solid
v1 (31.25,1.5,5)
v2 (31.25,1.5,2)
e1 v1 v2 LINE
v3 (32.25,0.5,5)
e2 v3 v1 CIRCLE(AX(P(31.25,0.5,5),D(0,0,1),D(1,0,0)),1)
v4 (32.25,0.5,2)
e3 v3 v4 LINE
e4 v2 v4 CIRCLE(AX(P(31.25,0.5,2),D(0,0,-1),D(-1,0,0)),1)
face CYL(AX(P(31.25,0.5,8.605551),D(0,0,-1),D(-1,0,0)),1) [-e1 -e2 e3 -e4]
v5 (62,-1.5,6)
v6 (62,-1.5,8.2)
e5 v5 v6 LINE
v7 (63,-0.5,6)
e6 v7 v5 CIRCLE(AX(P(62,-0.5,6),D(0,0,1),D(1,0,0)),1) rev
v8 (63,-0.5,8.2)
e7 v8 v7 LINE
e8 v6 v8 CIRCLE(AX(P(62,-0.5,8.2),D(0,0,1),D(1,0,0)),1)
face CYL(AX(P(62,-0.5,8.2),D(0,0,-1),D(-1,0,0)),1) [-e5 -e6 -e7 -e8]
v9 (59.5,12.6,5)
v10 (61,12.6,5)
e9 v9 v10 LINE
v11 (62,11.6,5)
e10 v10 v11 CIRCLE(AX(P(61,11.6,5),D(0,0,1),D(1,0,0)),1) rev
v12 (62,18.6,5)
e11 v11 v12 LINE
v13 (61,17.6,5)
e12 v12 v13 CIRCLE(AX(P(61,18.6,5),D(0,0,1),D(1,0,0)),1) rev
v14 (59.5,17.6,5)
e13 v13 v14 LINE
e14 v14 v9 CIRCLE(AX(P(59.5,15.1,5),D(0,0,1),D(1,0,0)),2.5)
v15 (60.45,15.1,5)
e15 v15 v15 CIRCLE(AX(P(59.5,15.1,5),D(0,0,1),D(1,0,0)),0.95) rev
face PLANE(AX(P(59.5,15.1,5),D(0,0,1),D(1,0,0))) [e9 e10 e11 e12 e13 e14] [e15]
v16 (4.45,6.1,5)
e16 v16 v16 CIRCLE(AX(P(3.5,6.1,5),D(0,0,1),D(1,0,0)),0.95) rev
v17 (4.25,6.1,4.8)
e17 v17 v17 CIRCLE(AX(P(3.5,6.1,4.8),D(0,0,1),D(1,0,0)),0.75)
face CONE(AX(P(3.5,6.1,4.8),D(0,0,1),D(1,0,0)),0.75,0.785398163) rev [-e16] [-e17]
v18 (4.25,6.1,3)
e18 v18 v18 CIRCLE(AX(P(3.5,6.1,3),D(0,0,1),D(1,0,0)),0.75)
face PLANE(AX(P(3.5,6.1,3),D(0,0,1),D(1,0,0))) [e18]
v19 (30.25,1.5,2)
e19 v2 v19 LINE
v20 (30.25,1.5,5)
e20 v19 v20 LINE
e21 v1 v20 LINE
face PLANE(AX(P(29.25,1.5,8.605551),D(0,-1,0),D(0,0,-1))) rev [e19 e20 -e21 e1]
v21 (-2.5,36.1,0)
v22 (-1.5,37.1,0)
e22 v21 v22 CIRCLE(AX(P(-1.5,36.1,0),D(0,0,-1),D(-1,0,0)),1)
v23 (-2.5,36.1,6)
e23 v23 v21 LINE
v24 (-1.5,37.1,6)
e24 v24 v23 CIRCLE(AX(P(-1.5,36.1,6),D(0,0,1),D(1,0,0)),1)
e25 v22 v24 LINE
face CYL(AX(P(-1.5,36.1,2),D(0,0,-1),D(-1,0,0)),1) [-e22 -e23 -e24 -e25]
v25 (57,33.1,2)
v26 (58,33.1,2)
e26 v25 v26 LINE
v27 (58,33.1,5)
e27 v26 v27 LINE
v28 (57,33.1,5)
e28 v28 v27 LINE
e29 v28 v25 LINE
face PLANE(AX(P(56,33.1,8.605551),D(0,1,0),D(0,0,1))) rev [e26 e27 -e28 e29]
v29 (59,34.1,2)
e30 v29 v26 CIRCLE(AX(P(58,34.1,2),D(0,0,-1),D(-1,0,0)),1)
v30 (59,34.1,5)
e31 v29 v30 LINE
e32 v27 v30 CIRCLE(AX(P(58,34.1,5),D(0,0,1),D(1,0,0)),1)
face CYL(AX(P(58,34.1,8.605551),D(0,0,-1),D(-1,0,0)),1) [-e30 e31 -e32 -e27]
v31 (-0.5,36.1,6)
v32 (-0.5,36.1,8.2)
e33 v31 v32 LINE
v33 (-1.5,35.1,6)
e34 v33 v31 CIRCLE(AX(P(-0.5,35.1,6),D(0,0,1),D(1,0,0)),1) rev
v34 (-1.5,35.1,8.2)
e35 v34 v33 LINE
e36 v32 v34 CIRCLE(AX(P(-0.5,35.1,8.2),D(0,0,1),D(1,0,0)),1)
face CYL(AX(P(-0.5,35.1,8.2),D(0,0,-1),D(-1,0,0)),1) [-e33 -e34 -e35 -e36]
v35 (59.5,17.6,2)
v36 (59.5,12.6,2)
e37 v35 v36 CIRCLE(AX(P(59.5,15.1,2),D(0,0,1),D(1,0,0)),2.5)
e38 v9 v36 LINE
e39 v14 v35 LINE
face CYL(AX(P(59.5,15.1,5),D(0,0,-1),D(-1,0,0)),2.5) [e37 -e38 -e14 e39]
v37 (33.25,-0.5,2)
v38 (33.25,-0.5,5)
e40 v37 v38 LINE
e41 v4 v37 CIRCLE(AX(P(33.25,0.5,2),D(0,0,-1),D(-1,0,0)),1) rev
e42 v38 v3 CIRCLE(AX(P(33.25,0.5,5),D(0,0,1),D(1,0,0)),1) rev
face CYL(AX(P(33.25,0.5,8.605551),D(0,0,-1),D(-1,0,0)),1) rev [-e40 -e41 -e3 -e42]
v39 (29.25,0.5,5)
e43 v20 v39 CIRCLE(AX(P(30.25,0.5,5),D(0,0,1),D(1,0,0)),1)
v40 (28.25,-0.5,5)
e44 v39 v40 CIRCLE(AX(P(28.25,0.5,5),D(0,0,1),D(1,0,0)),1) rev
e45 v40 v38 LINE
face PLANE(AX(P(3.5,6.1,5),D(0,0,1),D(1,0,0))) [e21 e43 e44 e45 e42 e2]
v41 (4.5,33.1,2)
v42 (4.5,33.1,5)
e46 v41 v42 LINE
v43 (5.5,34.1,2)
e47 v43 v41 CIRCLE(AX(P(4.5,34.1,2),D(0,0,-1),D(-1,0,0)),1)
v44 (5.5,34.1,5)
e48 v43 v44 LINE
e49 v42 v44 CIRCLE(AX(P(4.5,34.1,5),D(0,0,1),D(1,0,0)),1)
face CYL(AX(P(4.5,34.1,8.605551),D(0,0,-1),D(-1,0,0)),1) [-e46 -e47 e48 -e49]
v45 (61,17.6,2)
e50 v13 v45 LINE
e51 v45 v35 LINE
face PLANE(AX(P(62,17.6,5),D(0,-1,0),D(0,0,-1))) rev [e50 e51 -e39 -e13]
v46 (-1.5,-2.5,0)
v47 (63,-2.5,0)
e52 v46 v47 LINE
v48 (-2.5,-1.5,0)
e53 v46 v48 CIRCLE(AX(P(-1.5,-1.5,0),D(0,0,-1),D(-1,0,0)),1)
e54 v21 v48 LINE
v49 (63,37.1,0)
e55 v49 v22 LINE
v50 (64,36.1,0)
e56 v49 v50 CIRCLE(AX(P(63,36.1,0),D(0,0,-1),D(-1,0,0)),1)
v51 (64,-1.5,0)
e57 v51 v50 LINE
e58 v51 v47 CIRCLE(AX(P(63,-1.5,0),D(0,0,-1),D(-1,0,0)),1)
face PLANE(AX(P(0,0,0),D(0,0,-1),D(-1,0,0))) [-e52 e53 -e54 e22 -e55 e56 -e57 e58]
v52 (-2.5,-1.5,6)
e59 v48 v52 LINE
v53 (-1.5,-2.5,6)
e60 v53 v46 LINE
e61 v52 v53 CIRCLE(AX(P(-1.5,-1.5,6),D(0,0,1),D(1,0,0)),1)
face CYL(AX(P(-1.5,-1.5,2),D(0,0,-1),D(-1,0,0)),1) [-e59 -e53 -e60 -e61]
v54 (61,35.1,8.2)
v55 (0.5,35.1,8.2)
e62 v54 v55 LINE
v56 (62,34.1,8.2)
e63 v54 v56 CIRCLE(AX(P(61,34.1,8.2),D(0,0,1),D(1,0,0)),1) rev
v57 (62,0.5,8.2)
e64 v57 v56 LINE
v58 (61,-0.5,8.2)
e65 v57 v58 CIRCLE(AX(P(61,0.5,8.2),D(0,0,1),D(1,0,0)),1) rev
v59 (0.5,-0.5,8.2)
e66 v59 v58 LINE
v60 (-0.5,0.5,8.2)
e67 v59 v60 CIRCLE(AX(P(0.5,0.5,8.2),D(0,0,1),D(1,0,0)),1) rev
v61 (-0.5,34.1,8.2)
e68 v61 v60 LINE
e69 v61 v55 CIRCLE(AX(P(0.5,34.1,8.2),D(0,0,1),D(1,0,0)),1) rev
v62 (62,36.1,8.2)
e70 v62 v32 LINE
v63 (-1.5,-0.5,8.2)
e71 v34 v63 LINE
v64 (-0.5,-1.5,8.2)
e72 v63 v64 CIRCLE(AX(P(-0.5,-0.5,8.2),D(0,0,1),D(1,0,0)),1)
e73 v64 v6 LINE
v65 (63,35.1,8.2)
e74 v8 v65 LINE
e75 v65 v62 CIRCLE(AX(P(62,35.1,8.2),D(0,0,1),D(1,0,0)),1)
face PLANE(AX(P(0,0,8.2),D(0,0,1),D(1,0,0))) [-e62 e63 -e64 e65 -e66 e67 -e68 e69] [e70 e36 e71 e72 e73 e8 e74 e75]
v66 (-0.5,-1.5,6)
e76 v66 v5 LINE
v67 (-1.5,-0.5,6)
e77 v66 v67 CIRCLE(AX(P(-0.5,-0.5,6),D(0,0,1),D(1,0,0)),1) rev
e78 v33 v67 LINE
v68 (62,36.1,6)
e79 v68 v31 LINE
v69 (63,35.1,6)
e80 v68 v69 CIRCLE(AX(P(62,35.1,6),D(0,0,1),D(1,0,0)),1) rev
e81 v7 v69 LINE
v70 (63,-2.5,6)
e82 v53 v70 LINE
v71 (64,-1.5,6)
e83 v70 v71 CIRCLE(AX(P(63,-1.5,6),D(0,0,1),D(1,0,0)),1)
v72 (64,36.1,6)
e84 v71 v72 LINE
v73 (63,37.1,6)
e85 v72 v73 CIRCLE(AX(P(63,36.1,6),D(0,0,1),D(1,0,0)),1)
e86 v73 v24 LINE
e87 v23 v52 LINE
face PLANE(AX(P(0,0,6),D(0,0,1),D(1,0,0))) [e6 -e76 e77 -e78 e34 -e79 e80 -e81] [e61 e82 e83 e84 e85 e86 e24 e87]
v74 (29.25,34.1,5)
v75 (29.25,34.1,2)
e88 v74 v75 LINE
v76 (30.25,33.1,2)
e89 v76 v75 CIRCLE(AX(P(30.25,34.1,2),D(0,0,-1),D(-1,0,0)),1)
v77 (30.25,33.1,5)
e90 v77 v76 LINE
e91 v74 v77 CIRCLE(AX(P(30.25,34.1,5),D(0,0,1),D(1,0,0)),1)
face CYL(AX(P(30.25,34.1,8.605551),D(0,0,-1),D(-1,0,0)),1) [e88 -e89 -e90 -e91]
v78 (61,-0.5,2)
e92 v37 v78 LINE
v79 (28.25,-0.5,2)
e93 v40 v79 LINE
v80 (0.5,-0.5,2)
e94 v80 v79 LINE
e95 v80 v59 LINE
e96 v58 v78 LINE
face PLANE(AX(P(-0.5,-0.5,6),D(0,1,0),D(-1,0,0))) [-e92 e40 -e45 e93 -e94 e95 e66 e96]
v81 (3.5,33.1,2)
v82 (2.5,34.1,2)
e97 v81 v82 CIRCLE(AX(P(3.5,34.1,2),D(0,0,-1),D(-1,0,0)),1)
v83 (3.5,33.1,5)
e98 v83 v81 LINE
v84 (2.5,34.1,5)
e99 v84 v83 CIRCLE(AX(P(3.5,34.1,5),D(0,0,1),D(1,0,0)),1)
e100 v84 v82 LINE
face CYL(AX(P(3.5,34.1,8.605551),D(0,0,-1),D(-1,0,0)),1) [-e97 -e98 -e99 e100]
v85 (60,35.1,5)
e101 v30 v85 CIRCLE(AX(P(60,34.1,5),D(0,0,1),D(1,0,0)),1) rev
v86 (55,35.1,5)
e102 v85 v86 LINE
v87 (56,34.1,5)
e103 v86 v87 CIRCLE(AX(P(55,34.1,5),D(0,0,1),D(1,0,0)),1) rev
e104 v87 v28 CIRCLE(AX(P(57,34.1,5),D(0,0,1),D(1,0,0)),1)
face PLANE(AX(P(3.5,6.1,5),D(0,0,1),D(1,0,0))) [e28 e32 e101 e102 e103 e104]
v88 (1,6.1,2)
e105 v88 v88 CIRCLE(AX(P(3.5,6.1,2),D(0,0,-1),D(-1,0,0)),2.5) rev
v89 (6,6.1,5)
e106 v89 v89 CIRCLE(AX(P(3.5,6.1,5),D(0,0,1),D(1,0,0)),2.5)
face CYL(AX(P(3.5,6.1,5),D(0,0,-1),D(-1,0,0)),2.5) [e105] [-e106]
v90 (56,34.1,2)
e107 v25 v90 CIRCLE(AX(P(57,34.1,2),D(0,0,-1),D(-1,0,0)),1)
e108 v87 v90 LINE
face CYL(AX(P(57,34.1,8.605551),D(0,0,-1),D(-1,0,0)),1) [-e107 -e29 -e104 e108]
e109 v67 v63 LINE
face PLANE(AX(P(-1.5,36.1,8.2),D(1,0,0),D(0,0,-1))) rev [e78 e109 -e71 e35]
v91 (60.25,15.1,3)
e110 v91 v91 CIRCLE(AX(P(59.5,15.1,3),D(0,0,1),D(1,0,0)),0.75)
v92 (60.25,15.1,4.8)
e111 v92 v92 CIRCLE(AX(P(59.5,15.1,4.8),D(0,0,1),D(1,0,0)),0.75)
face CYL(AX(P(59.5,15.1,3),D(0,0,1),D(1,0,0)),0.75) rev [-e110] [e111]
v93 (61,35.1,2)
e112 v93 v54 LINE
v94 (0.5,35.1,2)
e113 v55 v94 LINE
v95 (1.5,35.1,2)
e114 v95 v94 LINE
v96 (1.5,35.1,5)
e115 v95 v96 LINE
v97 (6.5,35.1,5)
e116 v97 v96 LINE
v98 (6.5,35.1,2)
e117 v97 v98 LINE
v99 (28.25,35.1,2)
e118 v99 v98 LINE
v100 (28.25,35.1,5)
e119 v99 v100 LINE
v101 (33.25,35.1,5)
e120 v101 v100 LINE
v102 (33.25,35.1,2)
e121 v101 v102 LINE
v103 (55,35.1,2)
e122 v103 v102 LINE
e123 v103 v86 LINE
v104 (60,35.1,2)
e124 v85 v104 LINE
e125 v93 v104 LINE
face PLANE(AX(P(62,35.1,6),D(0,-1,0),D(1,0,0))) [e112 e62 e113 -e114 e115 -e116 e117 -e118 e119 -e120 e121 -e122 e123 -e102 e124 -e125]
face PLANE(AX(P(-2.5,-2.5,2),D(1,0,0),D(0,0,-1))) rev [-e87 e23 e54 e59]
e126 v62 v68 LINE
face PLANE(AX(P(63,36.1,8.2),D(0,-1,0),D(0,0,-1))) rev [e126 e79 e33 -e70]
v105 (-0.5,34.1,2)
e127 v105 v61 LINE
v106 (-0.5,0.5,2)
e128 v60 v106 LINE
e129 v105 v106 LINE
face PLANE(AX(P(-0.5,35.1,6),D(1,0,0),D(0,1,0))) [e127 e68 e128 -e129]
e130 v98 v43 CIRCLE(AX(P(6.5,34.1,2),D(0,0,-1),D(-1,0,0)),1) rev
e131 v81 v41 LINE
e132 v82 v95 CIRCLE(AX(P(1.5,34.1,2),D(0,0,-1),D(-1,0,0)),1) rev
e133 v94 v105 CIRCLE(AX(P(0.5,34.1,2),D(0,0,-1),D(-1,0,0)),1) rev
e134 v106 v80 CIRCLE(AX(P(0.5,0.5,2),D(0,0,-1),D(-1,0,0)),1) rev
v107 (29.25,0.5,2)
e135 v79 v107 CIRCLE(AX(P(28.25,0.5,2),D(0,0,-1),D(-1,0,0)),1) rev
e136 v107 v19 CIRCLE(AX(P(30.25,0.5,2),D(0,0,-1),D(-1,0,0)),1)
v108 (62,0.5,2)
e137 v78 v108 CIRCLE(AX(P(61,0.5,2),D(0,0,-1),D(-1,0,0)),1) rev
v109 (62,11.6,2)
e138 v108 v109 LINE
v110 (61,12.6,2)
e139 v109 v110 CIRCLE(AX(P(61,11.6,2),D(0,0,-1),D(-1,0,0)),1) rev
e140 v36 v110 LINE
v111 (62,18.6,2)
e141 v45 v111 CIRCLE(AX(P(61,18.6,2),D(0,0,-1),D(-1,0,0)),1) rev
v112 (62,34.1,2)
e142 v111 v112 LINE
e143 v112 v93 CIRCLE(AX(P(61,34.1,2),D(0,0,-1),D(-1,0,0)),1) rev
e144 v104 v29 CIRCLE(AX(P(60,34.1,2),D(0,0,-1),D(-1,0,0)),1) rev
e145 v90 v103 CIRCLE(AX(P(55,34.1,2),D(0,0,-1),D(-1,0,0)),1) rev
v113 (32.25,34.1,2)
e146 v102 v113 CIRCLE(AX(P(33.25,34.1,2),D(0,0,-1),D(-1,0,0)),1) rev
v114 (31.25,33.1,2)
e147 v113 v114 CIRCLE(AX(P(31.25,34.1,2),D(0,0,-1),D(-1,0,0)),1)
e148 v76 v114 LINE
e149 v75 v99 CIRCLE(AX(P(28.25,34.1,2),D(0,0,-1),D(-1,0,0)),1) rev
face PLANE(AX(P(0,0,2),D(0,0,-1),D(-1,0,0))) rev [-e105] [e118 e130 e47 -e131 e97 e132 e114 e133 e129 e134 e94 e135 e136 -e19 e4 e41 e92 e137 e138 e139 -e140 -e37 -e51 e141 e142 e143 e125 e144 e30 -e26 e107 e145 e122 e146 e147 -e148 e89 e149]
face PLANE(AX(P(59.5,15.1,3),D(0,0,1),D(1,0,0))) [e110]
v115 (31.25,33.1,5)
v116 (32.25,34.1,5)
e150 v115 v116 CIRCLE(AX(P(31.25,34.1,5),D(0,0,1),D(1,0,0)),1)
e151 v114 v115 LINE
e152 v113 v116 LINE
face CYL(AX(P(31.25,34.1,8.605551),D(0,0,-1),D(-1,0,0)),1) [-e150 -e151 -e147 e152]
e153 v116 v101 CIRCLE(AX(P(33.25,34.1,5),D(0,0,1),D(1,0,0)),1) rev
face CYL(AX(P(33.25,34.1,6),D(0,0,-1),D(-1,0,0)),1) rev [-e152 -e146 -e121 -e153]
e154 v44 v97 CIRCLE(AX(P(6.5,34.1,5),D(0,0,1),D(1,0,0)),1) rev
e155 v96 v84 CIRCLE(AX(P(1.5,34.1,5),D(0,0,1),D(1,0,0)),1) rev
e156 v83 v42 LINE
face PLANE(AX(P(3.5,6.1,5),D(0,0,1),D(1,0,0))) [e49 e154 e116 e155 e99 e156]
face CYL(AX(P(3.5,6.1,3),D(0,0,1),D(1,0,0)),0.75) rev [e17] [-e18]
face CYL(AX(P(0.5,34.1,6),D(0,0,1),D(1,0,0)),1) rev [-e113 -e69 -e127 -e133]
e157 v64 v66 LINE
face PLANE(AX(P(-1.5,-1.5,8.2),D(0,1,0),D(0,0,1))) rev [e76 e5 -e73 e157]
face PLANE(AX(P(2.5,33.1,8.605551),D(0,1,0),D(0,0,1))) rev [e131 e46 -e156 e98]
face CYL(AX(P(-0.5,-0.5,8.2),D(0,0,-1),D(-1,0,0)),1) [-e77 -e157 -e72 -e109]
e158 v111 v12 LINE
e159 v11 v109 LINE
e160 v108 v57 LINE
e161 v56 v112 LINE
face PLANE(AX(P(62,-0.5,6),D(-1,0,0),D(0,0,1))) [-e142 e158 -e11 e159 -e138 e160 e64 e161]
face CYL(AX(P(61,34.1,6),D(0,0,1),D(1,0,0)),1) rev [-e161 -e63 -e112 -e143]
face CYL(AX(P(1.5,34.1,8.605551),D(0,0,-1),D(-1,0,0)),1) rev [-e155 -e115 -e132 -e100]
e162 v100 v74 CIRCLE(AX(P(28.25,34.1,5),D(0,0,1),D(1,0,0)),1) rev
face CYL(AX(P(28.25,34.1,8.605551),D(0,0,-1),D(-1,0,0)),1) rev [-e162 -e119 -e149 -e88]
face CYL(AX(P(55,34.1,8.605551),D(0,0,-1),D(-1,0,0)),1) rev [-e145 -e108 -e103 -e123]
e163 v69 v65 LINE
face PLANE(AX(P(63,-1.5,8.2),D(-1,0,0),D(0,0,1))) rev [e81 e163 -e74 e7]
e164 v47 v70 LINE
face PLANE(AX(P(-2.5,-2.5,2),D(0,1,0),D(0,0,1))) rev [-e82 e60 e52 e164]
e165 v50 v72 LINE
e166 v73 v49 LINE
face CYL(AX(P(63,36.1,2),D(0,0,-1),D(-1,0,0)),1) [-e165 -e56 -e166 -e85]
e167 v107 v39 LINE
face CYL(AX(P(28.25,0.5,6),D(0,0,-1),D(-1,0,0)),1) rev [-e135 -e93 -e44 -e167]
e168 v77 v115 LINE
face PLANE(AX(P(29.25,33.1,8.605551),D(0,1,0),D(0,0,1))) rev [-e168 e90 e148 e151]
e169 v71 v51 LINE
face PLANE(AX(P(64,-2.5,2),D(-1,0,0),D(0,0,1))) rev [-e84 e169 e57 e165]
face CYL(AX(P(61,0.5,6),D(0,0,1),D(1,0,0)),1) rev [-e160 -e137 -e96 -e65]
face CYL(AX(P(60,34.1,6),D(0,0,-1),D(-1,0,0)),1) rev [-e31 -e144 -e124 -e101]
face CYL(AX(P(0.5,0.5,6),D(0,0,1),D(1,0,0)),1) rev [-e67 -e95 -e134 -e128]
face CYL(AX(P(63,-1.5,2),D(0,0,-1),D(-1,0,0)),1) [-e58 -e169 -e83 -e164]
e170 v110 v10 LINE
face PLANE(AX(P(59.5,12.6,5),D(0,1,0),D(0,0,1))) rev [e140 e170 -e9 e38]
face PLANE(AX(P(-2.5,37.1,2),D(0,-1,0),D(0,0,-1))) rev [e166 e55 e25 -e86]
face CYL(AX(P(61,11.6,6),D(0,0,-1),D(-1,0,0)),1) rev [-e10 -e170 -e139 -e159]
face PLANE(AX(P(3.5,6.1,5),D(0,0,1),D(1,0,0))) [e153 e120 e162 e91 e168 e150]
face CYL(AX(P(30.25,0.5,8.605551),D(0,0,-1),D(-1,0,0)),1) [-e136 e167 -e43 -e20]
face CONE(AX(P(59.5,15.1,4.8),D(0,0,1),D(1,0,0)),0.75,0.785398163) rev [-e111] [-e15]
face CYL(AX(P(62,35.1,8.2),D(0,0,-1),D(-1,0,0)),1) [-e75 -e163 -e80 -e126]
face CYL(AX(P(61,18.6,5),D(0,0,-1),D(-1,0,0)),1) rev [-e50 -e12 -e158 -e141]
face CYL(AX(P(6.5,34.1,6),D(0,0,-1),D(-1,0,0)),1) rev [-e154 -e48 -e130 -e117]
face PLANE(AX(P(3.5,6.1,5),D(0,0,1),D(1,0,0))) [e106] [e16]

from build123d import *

# Parameters (mm, degrees)
SKETCH4_W            = 66.5
SKETCH4_H            = 39.6
BOSS_EXTRUDE4_DEPTH  = 2
SKETCH5_W            = 66.5
SKETCH5_H            = 39.6
SKETCH5_W_2          = 62.5
SKETCH5_H_2          = 35.6
BOSS_EXTRUDE5_DEPTH  = 4
SKETCH6_R            = 2.5
BOSS_EXTRUDE8_DEPTH  = 3
SKETCH7_R            = 0.75
CUT_EXTRUDE1_DEPTH   = 2
SKETCH9_W            = 64.5
SKETCH9_H            = 37.6
SKETCH9_W_2          = 62.5
SKETCH9_H_2          = 35.6
BOSS_EXTRUDE9_DEPTH  = 2.2
CHAMFER1_SIZE        = 0.2
CHAMFER2_SIZE        = 0.2
SKETCH11_W           = 3
SKETCH11_H           = 2
BOSS_EXTRUDE10_DEPTH = 3
FILLET1_R            = 1


with BuildPart() as part:
    # Sketch4 → Boss-Extrude4 (new body)
    with BuildSketch(Plane.XY):
        with Locations((30.75, 17.3)):
            Rectangle(SKETCH4_W, SKETCH4_H)
    extrude(amount=BOSS_EXTRUDE4_DEPTH)

    # Sketch5 → Boss-Extrude5 (add)
    with BuildSketch(Plane.XY.offset(2)):
        with Locations((30.75, 17.3)):
            Rectangle(SKETCH5_W, SKETCH5_H)
        with Locations((30.75, 17.3)):
            Rectangle(SKETCH5_W_2, SKETCH5_H_2, mode=Mode.SUBTRACT)
    extrude(amount=BOSS_EXTRUDE5_DEPTH)

    # Sketch6 → Boss-Extrude8 (add)
    with BuildSketch(Plane.XY.offset(2)):
        with Locations(Location((3.5, 6.1, 0), (0, 0, 180))):
            Circle(SKETCH6_R)
        with BuildLine():
            Line((59.5, 12.6), (62, 12.6))
            Line((62, 12.6), (62, 17.6))
            Line((62, 17.6), (59.5, 17.6))
            ThreePointArc((59.5, 17.6), (57, 15.1), (59.5, 12.6))
        make_face()
    extrude(amount=BOSS_EXTRUDE8_DEPTH)

    # Sketch7 → Cut-Extrude1 (cut)
    with BuildSketch(Plane.XY.offset(5)):
        with Locations((59.5, 15.1)):
            Circle(SKETCH7_R)
        with Locations((3.5, 6.1)):
            Circle(SKETCH7_R)
    extrude(amount=-CUT_EXTRUDE1_DEPTH, mode=Mode.SUBTRACT)

    # Sketch9 → Boss-Extrude9 (add)
    with BuildSketch(Plane.XY.offset(6)):
        with Locations((30.75, 17.3)):
            Rectangle(SKETCH9_W, SKETCH9_H)
        with Locations((30.75, 17.3)):
            Rectangle(SKETCH9_W_2, SKETCH9_H_2, mode=Mode.SUBTRACT)
    extrude(amount=BOSS_EXTRUDE9_DEPTH)

    # Chamfer1
    chamfer1_edges = [part.edges().sort_by_distance(p)[0] for p in [
        (2.75, 6.1, 5),
    ]]
    chamfer(chamfer1_edges, length=CHAMFER1_SIZE)

    # Chamfer2
    chamfer2_edges = [part.edges().sort_by_distance(p)[0] for p in [
        (58.75, 15.1, 5),
    ]]
    chamfer(chamfer2_edges, length=CHAMFER2_SIZE)

    # Sketch11 → Boss-Extrude10 (add)
    with BuildSketch(Plane.XY.offset(2)):
        with Locations((4, 34.1)):
            Rectangle(SKETCH11_W, SKETCH11_H)
        with Locations((30.75, 34.1)):
            Rectangle(SKETCH11_W, SKETCH11_H)
        with Locations((57.5, 34.1)):
            Rectangle(SKETCH11_W, SKETCH11_H)
        with Locations((30.75, 0.5)):
            Rectangle(SKETCH11_W, SKETCH11_H)
    extrude(amount=BOSS_EXTRUDE10_DEPTH)

    # Fillet1
    fillet1_edges = [part.edges().sort_by_distance(p)[0] for p in [
        (-1.5, 36.1, 7.1),
        (-2.5, 37.1, 3),
        (-1.5, -1.5, 7.1),
        (-2.5, -2.5, 3),
        (63, 36.1, 7.1),
        (63, -1.5, 7.1),
        (64, -2.5, 3),
        (64, 37.1, 3),
        (-0.5, -0.5, 5.1),
        (-0.5, 35.1, 5.1),
        (62, -0.5, 5.1),
        (62, 35.1, 5.1),
        (62, 12.6, 3.5),
        (62, 17.6, 3.5),
        (32.25, -0.5, 3.5),
        (29.25, -0.5, 3.5),
        (56, 35.1, 3.5),
        (59, 35.1, 3.5),
        (32.25, 35.1, 3.5),
        (29.25, 35.1, 3.5),
        (5.5, 35.1, 3.5),
        (2.5, 35.1, 3.5),
        (29.25, 1.5, 3.5),
        (32.25, 1.5, 3.5),
        (59, 33.1, 3.5),
        (56, 33.1, 3.5),
        (32.25, 33.1, 3.5),
        (29.25, 33.1, 3.5),
        (5.5, 33.1, 3.5),
        (2.5, 33.1, 3.5),
    ]]
    fillet(fillet1_edges, radius=FILLET1_R - 0.0001)  # a hair under: the kernel refuses the full size


solid = part.part
